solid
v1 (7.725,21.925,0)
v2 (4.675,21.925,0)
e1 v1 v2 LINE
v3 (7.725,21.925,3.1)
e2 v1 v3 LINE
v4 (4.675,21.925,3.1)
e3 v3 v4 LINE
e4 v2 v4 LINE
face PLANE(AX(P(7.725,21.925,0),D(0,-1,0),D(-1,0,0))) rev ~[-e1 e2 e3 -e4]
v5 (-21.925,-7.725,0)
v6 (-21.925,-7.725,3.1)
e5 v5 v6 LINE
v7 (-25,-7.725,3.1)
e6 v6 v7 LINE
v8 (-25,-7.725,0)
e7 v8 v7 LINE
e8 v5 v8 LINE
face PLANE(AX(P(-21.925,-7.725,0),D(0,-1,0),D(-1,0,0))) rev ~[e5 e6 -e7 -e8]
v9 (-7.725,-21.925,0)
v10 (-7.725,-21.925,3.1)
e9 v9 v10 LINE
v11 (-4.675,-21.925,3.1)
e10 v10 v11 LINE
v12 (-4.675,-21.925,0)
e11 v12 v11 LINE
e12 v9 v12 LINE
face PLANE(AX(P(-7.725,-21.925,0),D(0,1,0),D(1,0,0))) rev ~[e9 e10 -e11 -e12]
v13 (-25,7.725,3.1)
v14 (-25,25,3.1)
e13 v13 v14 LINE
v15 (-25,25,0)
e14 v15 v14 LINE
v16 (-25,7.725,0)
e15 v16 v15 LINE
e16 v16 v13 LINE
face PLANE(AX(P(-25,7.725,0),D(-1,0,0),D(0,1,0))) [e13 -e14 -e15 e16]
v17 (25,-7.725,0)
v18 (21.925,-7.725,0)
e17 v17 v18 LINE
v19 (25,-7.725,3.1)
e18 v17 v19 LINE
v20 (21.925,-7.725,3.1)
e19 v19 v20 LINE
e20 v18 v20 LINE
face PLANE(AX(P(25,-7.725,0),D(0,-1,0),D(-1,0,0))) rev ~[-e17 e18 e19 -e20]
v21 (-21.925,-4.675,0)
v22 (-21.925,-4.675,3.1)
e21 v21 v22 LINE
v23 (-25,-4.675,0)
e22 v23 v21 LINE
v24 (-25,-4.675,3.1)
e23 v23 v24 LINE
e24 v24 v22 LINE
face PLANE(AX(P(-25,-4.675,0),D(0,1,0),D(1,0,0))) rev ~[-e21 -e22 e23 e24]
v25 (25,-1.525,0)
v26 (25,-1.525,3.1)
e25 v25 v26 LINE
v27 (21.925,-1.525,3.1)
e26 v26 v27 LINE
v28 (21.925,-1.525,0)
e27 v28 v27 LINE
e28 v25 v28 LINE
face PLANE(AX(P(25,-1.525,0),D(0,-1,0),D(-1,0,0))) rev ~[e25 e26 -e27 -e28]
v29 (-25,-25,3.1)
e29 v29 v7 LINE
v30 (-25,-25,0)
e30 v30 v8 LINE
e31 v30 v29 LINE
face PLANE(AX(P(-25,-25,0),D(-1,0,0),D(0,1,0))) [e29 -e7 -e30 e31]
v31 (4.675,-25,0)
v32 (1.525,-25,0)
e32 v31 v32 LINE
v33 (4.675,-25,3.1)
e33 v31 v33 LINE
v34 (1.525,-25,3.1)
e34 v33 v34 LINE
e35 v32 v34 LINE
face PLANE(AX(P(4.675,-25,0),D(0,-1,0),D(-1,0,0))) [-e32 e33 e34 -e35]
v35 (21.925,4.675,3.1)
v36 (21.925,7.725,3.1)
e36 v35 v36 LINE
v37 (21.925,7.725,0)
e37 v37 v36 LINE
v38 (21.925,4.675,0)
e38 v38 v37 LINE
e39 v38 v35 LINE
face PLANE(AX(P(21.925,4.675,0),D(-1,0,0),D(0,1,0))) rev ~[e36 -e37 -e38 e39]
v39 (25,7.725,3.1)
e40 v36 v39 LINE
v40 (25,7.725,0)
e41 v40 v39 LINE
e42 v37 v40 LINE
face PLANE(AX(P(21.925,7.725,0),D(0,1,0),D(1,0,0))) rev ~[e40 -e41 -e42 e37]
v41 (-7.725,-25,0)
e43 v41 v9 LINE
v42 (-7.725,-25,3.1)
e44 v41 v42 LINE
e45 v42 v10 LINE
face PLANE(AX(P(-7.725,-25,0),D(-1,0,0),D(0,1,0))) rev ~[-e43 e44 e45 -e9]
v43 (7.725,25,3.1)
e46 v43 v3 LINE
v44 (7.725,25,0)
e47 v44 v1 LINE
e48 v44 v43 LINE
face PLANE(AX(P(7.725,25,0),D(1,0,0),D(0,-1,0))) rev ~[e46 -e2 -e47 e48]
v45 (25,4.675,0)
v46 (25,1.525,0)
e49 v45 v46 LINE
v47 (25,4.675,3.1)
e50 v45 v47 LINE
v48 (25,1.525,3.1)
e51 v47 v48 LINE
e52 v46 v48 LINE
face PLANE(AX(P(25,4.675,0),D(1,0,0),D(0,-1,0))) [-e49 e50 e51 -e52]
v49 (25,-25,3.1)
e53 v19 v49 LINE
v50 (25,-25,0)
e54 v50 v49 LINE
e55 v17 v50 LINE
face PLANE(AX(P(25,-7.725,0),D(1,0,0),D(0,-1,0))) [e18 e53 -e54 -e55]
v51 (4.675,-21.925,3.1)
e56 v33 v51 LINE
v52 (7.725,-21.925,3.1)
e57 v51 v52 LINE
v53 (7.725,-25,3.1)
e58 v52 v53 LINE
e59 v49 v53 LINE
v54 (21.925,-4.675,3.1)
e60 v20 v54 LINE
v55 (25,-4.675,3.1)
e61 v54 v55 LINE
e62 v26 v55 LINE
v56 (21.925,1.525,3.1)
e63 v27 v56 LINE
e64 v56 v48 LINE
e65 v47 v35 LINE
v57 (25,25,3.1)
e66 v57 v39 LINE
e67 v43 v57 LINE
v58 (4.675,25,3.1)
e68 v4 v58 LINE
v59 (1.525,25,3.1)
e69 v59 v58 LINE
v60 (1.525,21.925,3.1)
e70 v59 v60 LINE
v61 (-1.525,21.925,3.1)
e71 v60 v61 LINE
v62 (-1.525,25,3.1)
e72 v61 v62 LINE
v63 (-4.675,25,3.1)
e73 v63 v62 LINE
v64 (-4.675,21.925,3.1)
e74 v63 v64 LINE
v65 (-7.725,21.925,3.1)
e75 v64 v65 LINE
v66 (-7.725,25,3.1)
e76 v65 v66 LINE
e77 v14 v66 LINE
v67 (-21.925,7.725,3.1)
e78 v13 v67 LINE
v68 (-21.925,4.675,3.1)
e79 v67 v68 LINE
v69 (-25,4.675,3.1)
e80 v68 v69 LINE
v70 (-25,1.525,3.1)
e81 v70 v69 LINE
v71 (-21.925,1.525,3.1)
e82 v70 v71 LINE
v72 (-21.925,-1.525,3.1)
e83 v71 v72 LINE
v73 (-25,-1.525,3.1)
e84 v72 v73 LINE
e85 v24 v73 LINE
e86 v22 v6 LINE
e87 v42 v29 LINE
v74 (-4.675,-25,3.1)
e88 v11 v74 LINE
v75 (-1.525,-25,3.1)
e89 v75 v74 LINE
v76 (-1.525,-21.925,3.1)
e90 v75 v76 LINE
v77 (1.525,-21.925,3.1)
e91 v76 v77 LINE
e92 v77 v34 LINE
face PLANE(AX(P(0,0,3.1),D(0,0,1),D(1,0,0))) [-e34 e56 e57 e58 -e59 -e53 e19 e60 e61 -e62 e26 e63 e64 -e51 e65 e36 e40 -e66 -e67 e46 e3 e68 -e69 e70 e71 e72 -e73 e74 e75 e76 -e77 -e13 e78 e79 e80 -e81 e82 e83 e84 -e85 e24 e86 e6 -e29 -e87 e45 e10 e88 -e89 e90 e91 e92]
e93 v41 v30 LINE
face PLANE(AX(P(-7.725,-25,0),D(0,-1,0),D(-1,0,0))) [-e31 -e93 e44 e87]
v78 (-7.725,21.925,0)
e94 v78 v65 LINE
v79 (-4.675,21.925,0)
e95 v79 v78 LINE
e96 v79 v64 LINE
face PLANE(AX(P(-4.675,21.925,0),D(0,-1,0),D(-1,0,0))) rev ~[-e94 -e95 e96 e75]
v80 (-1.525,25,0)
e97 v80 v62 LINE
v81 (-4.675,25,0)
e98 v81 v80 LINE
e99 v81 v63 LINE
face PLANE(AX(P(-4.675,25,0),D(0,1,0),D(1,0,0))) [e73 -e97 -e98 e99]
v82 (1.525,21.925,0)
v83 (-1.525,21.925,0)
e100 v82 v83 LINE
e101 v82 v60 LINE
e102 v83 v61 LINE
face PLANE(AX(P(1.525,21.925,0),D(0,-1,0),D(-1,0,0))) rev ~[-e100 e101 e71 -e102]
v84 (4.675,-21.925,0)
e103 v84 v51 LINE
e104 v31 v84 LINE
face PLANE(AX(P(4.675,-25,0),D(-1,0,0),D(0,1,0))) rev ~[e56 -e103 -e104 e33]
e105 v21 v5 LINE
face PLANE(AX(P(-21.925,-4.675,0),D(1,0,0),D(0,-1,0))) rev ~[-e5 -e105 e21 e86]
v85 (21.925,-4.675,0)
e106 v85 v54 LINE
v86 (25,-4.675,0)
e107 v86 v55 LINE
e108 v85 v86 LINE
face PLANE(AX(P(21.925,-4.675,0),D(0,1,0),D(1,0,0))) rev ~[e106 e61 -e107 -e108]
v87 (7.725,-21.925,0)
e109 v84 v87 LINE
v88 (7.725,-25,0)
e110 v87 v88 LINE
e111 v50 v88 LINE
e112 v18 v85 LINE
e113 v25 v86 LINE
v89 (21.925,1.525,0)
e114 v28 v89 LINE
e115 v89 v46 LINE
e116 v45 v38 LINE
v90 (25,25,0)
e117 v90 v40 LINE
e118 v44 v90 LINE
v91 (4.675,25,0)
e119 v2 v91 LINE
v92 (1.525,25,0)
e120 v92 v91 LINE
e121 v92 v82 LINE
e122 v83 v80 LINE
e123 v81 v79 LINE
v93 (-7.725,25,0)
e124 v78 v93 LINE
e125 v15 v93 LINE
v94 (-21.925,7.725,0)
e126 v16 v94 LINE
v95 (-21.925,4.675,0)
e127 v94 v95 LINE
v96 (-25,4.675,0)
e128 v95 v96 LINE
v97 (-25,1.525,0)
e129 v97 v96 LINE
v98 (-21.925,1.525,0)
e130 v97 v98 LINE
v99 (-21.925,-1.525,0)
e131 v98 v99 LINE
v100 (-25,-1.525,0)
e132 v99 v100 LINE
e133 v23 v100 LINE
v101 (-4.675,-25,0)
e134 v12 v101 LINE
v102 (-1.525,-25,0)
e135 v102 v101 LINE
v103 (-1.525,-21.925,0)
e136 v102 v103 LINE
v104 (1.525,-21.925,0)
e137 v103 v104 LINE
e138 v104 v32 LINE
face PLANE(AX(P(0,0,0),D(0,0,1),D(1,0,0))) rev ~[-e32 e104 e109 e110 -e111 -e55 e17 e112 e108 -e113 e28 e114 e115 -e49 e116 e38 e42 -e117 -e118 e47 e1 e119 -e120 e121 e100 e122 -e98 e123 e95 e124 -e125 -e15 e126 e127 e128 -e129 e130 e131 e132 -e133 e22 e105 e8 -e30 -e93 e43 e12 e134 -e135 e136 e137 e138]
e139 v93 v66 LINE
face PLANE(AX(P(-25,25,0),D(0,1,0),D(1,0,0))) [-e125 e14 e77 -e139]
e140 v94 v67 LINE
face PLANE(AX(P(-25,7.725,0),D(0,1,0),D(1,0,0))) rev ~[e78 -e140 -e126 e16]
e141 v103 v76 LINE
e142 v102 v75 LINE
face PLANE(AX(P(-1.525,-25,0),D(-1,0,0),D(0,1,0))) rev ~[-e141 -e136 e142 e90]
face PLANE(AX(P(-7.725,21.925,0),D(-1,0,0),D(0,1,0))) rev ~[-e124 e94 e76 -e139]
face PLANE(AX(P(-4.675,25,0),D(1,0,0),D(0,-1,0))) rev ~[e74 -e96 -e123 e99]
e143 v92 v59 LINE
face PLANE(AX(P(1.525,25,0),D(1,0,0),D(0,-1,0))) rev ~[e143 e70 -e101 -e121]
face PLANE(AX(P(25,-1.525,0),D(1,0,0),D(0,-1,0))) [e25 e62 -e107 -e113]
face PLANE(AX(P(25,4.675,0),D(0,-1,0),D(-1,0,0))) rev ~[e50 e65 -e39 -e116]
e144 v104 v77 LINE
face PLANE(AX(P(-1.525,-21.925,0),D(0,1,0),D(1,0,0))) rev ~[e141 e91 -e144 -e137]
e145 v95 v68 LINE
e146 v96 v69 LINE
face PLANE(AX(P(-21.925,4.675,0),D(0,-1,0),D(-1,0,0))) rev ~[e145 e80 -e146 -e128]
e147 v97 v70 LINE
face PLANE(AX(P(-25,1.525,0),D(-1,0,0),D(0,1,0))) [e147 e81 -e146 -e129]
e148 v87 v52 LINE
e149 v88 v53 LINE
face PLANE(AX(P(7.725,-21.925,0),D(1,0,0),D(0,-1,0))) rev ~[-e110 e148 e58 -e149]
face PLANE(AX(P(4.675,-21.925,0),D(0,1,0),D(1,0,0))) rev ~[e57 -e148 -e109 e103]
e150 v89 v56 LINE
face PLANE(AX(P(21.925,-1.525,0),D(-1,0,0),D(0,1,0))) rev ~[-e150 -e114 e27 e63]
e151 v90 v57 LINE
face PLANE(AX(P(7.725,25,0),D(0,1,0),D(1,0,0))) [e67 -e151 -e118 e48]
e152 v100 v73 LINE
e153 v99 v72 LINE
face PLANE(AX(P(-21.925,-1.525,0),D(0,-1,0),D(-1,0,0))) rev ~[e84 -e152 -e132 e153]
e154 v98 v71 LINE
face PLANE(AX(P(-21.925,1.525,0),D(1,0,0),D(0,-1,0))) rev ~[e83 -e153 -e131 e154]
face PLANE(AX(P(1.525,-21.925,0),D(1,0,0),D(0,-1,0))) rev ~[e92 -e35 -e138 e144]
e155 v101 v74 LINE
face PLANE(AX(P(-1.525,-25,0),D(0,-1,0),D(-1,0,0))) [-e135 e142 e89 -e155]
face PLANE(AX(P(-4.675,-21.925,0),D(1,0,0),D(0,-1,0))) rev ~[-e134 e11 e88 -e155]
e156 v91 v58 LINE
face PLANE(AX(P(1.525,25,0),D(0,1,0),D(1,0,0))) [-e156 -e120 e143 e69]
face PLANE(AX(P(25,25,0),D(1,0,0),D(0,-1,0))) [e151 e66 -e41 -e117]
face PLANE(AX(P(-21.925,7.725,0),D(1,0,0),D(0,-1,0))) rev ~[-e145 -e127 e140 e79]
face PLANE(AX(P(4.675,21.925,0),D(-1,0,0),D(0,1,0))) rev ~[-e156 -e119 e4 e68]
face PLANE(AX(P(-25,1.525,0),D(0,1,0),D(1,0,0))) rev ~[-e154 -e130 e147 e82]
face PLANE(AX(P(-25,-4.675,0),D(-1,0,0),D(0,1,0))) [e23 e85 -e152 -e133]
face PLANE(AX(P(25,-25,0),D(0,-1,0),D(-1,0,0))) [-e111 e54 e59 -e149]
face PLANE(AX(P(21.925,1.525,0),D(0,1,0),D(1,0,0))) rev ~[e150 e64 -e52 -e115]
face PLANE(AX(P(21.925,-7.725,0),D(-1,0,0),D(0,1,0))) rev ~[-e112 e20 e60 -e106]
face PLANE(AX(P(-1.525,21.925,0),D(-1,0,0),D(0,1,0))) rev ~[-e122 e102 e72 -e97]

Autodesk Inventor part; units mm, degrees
ref_plane "YZ Plane" through (0, 0, 0) normal (1, 0, 0) x (0, 1, 0)
ref_plane "XZ Plane" through (0, 0, 0) normal (0, 1, 0) x (-1, 0, 0)
ref_plane "XY Plane" through (0, 0, 0) normal (0, 0, 1) x (1, 0, 0)
sketch "slots" plane through (0, 0, 0) normal (0, 0, 1) x (1, 0, 0)
  line L0 (61.2067, 31.1821) -> (64.2567, 31.1821)
  line L1 (64.2567, 31.1821) -> (64.2567, 28.1071)
  line L2 (64.2567, 28.1071) -> (61.2067, 28.1071)
  line L3 (61.2067, 28.1071) -> (61.2067, 31.1821)
  line L4 (68.9317, 33.8834) -> (68.9317, 26.9198) construction
  line L5 (67.4067, 31.1821) -> (70.4567, 31.1821)
  line L6 (70.4567, 31.1821) -> (70.4567, 28.1071)
  line L7 (70.4567, 28.1071) -> (67.4067, 28.1071)
  line L8 (67.4067, 28.1071) -> (67.4067, 31.1821)
  line L9 (73.6067, 31.1821) -> (76.6567, 31.1821)
  line L10 (76.6567, 31.1821) -> (76.6567, 28.1071)
  line L11 (76.6567, 28.1071) -> (73.6067, 28.1071)
  line L12 (73.6067, 28.1071) -> (73.6067, 31.1821)
  line L13 (68.9317, 28.1071) -> (68.9317, 27.1937) construction
  point P0 (68.8645, 30.3856)
  dimension "d2" = 3.05
  dimension "d3" = 3.075
  dimension "d4" = 3.15
  dimension "d5" = 3.15
sketch "Sketch1" plane through (0, 0, 0) normal (0, 0, 1) x (1, 0, 0)
  line L0 (-25, 25) -> (25, 25)
  line L1 (25, 25) -> (25, -25)
  line L2 (25, -25) -> (-25, -25)
  line L3 (-25, -25) -> (-25, 25)
  line L4 (0, 40.2669) -> (0, -57.9846) construction
  line L5 (-45.3823, 0) -> (61.3149, 0) construction
  line L6 (-7.725, 25) -> (-4.675, 25)
  line L7 (-4.675, 25) -> (-4.675, 21.925)
  line L8 (-4.675, 21.925) -> (-7.725, 21.925)
  line L9 (-7.725, 21.925) -> (-7.725, 25)
  line L10 (0, 27.7013) -> (0, 20.7377) construction
  line L11 (-1.525, 25) -> (1.525, 25)
  line L12 (1.525, 25) -> (1.525, 21.925)
  line L13 (1.525, 21.925) -> (-1.525, 21.925)
  line L14 (-1.525, 21.925) -> (-1.525, 25)
  line L15 (4.675, 25) -> (7.725, 25)
  line L16 (7.725, 25) -> (7.725, 21.925)
  line L17 (7.725, 21.925) -> (4.675, 21.925)
  line L18 (4.675, 21.925) -> (4.675, 25)
  line L19 (0, 21.925) -> (0, 21.0116) construction
  line L20 (-7.725, -21.925) -> (-4.675, -21.925)
  line L21 (-4.675, -21.925) -> (-4.675, -25)
  line L22 (-4.675, -25) -> (-7.725, -25)
  line L23 (-7.725, -25) -> (-7.725, -21.925)
  line L24 (0, -19.2237) -> (0, -26.1873) construction
  line L25 (-1.525, -21.925) -> (1.525, -21.925)
  line L26 (1.525, -21.925) -> (1.525, -25)
  line L27 (1.525, -25) -> (-1.525, -25)
  line L28 (-1.525, -25) -> (-1.525, -21.925)
  line L29 (4.675, -21.925) -> (7.725, -21.925)
  line L30 (7.725, -21.925) -> (7.725, -25)
  line L31 (7.725, -25) -> (4.675, -25)
  line L32 (4.675, -25) -> (4.675, -21.925)
  line L33 (0, -25) -> (0, -25.9134) construction
  line L34 (-25, -7.725) -> (-25, -4.675)
  line L35 (-25, -4.675) -> (-21.925, -4.675)
  line L36 (-21.925, -4.675) -> (-21.925, -7.725)
  line L37 (-21.925, -7.725) -> (-25, -7.725)
  line L38 (-27.7013, 0) -> (-20.7377, 0) construction
  line L39 (-25, -1.525) -> (-25, 1.525)
  line L40 (-25, 1.525) -> (-21.925, 1.525)
  line L41 (-21.925, 1.525) -> (-21.925, -1.525)
  line L42 (-21.925, -1.525) -> (-25, -1.525)
  line L43 (-25, 4.675) -> (-25, 7.725)
  line L44 (-25, 7.725) -> (-21.925, 7.725)
  line L45 (-21.925, 7.725) -> (-21.925, 4.675)
  line L46 (-21.925, 4.675) -> (-25, 4.675)
  line L47 (-21.925, 0) -> (-21.0116, 0) construction
  line L48 (21.925, -7.725) -> (21.925, -4.675)
  line L49 (21.925, -4.675) -> (25, -4.675)
  line L50 (25, -4.675) -> (25, -7.725)
  line L51 (25, -7.725) -> (21.925, -7.725)
  line L52 (19.2237, 0) -> (26.1873, 0) construction
  line L53 (21.925, -1.525) -> (21.925, 1.525)
  line L54 (21.925, 1.525) -> (25, 1.525)
  line L55 (25, 1.525) -> (25, -1.525)
  line L56 (25, -1.525) -> (21.925, -1.525)
  line L57 (21.925, 4.675) -> (21.925, 7.725)
  line L58 (21.925, 7.725) -> (25, 7.725)
  line L59 (25, 7.725) -> (25, 4.675)
  line L60 (25, 4.675) -> (21.925, 4.675)
  line L61 (25, 0) -> (25.9134, 0) construction
  point P0 (0, 0)
  point P1 (25, 0)
  point P2 (0, 25)
  dimension "d0" = 50
  dimension "d1" = 50
extrude "Extrusion1" add sketch "Sketch1" along normal blind 3.1 contours L0 L9 L8 L7 L14 L13 L12 L18 L17 L16 L1 L58 L57 L60 L54 L53 L56 L49 L48 L51 L2 L30 L29 L32 L26 L25 L28 L21 L20 L23 L3 L37 L36 L35 L42 L41 L40 L46 L45 L44
equation "\"d2\" = mat - kerf"
equation "\"d3\" = mat - 0.5 * kerf"
equation "\"d4\" = mat + kerf"
equation "\"d5\" = mat + kerf"
equation "\"d8\" = mat"
equation "\"mat\" = 3.1"
equation "\"kerf\" = 0.05"
properties part number "base"
